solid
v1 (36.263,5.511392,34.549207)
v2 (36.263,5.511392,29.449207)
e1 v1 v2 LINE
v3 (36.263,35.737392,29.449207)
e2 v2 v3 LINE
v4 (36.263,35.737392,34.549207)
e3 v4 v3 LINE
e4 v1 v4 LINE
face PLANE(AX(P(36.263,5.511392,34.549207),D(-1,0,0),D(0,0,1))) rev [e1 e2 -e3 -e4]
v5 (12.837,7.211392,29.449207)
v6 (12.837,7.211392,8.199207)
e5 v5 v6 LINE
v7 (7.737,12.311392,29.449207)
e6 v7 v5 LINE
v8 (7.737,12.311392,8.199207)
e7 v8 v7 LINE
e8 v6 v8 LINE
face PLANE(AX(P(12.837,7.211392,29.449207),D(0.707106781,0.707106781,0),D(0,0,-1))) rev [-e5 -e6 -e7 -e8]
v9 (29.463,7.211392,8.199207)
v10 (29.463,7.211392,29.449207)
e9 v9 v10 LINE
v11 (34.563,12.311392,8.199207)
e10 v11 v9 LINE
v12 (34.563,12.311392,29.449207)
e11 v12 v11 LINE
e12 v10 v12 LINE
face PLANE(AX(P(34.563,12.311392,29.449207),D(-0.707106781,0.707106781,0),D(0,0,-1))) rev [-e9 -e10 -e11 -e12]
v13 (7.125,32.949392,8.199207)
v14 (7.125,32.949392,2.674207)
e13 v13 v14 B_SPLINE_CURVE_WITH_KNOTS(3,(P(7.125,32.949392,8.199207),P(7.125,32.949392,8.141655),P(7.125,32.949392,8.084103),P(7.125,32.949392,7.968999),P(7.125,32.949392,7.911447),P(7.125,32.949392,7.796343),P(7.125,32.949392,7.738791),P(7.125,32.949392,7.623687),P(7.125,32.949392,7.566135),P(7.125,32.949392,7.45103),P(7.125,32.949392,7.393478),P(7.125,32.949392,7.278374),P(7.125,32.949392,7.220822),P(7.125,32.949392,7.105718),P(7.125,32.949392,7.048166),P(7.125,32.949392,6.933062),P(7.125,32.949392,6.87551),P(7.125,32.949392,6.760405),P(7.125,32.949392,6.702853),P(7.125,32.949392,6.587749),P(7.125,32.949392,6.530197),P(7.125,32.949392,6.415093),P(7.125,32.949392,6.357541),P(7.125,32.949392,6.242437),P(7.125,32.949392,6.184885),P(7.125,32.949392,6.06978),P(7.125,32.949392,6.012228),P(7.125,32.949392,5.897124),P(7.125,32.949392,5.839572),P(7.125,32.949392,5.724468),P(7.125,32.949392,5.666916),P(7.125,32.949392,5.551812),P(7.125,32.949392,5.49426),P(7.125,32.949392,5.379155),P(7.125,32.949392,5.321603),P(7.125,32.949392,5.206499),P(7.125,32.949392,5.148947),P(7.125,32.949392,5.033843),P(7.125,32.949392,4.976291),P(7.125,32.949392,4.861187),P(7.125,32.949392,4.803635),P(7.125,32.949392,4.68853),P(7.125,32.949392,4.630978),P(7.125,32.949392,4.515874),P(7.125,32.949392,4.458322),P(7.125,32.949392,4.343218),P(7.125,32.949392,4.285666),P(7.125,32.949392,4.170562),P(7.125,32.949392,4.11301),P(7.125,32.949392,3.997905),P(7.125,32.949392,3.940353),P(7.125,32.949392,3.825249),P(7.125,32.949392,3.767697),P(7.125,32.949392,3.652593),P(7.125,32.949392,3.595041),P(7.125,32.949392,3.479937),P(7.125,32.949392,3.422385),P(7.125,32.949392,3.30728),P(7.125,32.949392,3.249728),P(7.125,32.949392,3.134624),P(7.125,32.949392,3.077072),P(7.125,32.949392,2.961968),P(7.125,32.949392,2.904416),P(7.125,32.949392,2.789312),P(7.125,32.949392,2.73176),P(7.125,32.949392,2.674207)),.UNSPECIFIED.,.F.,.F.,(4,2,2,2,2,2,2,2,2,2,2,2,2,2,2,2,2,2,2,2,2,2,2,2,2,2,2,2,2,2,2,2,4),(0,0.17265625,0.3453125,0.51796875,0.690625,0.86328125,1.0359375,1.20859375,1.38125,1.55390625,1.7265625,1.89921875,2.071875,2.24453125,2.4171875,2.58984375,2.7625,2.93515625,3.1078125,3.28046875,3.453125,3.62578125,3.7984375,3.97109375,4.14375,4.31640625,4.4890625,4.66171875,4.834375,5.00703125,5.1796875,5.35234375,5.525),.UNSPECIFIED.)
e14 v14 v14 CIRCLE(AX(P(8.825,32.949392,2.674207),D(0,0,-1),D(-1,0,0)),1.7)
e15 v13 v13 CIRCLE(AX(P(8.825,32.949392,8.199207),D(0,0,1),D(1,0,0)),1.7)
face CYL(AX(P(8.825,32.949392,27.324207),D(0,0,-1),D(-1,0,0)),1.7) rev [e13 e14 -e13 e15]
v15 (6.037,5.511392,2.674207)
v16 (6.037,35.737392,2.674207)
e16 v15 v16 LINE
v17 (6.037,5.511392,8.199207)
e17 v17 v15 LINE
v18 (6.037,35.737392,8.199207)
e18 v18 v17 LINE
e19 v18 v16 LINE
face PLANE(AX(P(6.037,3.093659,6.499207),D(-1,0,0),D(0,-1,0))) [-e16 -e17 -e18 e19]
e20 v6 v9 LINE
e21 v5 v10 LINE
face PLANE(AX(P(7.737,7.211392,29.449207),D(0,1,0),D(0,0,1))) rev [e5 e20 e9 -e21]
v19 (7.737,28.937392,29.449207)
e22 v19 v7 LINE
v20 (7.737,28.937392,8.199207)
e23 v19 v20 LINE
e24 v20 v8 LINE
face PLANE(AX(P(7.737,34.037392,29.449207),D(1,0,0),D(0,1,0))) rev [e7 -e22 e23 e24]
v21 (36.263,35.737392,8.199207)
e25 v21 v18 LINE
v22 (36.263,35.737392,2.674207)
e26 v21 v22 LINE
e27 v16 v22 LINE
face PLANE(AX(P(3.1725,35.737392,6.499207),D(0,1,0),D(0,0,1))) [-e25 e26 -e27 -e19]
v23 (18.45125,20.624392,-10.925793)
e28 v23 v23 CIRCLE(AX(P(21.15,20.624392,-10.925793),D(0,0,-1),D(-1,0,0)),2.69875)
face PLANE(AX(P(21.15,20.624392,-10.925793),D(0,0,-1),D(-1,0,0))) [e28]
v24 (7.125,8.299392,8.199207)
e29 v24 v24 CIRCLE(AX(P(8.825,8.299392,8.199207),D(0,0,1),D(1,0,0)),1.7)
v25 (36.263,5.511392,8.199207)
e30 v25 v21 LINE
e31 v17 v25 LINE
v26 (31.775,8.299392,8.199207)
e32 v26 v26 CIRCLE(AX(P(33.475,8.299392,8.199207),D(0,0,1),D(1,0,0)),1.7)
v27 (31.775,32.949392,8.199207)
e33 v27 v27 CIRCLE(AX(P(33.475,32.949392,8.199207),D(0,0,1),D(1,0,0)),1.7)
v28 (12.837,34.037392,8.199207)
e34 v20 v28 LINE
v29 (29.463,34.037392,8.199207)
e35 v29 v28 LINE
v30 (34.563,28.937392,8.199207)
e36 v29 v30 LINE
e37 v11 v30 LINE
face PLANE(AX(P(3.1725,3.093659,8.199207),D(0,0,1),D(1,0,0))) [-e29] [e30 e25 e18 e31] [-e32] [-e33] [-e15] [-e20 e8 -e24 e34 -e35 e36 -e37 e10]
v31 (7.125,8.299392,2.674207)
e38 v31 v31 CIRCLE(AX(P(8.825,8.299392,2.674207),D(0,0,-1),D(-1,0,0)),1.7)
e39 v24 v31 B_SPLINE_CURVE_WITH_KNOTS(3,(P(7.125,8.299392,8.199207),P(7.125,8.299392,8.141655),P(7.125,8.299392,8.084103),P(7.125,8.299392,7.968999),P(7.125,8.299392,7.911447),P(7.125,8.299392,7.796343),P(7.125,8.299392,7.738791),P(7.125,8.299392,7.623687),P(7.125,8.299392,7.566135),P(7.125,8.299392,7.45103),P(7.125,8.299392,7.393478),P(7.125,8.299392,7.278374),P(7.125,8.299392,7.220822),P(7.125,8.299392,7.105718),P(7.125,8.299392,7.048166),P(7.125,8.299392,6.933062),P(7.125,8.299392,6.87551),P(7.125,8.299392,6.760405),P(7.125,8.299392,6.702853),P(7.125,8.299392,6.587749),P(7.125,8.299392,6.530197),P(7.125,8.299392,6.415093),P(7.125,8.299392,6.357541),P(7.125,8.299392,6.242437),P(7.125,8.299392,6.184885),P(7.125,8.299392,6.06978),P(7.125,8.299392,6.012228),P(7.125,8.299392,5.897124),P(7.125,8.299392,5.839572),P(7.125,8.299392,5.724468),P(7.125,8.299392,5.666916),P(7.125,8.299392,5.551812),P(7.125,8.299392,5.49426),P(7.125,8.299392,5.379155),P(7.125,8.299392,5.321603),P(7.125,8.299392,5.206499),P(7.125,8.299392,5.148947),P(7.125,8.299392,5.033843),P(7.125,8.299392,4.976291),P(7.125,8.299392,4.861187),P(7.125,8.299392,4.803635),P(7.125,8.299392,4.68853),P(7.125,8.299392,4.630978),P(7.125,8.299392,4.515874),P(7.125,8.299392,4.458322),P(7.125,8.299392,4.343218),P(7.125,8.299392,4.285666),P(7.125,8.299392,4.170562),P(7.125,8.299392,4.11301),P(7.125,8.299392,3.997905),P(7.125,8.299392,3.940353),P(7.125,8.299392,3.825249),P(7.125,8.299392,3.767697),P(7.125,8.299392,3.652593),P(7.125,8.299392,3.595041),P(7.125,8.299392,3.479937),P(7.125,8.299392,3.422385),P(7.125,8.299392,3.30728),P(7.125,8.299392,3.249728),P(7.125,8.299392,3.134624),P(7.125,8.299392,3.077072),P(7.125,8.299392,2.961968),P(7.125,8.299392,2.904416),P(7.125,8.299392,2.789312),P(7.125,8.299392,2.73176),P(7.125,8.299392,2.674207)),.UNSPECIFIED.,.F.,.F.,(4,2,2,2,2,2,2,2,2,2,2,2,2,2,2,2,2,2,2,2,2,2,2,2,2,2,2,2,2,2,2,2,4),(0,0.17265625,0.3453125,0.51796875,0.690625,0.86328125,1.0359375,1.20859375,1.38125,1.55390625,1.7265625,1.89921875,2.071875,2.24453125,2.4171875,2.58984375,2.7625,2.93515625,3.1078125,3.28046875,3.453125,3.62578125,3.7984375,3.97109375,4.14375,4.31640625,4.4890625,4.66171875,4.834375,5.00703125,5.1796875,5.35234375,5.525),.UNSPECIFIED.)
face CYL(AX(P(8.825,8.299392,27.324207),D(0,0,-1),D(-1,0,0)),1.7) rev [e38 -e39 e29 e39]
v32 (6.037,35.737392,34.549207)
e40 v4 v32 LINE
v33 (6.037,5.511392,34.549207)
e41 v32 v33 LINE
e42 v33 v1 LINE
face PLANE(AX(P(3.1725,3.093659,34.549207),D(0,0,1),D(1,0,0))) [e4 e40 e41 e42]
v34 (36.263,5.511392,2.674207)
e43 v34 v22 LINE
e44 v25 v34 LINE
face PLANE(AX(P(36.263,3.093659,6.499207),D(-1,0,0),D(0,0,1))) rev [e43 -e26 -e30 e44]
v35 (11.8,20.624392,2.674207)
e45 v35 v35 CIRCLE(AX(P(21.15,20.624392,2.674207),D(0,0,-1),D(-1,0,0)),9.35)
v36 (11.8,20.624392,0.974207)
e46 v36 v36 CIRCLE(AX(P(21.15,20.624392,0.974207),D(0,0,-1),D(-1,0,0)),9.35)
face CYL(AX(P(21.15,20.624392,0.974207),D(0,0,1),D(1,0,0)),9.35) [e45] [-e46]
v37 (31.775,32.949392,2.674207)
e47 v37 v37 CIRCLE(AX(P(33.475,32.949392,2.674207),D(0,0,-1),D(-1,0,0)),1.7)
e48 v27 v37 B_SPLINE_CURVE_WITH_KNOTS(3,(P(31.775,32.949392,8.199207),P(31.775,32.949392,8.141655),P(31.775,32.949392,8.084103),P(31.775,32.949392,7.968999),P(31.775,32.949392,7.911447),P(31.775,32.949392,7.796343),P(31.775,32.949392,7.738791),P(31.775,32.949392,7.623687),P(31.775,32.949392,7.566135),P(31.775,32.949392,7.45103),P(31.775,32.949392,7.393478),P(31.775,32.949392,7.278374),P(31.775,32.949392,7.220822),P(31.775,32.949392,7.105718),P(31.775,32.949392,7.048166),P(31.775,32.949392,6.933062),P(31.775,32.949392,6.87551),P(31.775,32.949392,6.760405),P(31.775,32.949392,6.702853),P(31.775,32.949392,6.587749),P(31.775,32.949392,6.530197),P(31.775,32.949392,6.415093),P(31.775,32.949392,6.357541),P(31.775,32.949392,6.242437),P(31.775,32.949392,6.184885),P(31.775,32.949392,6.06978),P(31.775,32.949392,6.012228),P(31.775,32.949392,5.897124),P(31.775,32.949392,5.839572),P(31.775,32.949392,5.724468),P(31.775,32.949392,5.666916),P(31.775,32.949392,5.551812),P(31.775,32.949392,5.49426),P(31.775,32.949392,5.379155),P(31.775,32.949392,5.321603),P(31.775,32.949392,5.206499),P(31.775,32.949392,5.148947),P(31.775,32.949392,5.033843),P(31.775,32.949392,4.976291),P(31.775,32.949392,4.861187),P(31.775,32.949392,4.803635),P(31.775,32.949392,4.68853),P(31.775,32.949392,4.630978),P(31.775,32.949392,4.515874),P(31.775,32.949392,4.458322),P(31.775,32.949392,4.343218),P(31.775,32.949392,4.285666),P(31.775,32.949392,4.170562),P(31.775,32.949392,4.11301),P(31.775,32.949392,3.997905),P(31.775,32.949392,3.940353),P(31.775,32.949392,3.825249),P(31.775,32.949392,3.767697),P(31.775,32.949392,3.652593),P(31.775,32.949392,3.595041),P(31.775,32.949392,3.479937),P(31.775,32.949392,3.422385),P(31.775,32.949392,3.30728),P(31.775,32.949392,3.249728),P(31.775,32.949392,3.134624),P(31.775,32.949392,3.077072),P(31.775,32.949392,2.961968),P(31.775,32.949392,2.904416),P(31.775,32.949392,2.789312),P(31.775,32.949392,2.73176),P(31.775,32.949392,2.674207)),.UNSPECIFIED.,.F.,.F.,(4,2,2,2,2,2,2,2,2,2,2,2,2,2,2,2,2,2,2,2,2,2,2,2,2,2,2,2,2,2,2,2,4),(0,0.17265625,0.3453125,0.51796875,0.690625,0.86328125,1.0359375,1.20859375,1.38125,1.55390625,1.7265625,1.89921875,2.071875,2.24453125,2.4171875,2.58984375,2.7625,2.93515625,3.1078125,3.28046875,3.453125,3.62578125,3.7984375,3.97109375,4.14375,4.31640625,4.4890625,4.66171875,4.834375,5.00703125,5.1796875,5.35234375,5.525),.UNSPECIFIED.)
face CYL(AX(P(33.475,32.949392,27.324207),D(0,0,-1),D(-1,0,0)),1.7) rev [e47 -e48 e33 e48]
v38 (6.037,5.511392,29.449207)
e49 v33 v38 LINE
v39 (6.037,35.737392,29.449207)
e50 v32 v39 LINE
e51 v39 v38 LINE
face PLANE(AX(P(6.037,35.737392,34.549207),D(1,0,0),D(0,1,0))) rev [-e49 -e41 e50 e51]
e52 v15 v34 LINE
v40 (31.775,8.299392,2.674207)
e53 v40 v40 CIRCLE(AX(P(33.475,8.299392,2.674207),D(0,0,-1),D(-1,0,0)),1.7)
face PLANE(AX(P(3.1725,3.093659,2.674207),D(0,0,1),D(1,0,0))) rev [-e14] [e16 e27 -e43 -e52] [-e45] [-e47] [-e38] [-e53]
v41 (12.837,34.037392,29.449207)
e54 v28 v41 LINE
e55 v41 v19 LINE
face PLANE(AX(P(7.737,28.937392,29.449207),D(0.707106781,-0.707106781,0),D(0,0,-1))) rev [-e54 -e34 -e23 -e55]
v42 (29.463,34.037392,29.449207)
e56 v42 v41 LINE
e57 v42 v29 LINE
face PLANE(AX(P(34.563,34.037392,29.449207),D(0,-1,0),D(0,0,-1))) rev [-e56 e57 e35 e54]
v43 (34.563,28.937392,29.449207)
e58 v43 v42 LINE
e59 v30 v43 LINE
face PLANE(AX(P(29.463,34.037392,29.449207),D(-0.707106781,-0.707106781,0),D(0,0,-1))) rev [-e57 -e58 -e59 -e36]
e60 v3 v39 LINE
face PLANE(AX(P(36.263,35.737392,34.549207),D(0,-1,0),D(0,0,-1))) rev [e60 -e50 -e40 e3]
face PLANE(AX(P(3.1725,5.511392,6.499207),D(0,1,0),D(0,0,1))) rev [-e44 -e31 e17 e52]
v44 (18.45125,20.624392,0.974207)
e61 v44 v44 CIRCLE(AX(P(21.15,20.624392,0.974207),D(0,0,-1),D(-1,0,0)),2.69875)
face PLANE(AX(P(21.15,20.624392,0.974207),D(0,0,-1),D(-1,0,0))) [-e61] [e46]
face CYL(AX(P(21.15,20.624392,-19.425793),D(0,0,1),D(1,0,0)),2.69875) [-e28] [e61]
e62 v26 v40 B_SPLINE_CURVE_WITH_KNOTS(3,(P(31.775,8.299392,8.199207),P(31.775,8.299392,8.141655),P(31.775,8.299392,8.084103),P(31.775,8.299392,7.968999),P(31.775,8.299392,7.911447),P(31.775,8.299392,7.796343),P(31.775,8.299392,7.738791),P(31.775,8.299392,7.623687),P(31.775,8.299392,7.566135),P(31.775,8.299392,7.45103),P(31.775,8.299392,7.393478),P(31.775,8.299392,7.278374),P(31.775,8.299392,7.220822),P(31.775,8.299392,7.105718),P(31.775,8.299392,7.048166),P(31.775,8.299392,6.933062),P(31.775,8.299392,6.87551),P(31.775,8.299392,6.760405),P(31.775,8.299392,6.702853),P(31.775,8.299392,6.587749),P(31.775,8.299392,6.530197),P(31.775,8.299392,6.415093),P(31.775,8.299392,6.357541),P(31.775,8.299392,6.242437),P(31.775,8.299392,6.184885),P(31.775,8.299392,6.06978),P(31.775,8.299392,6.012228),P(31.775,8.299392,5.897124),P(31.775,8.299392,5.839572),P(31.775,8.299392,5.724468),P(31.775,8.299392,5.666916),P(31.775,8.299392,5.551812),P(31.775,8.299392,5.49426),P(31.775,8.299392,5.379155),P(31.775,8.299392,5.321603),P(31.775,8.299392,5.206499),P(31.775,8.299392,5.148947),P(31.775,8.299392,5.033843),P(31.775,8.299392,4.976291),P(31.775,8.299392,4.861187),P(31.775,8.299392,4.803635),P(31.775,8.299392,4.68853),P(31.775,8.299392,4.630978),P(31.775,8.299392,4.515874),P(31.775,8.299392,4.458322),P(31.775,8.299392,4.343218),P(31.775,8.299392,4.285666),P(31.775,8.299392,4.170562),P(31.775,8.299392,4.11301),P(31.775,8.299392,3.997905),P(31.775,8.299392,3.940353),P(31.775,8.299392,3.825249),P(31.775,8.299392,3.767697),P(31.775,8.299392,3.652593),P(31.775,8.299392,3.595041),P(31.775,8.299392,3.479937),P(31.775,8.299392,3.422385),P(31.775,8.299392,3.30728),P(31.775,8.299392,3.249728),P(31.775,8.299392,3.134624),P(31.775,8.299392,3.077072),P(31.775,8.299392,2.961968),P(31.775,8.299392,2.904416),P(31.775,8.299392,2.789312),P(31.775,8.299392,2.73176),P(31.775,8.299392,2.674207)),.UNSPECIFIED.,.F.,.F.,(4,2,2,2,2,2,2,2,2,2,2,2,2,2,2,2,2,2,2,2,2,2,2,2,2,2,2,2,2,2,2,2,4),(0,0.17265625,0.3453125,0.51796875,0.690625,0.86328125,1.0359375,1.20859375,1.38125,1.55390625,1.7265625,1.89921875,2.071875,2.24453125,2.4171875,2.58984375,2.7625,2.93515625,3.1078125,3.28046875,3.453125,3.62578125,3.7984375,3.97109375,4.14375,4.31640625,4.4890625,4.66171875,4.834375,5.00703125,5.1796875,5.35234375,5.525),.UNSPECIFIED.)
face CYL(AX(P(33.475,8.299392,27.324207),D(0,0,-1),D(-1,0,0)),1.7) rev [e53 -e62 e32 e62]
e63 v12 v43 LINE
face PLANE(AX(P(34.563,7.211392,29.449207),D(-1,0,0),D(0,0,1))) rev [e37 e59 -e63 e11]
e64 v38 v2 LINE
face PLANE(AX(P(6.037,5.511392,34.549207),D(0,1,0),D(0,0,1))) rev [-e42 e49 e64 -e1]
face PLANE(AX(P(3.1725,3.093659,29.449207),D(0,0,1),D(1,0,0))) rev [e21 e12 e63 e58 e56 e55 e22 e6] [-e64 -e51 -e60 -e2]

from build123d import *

# Parameters (mm, degrees)
SKETCH1_W           = 35.56
SKETCH1_H           = 35.56
BOSS_EXTRUDE1_DEPTH = 4.5
SKETCH2_W           = 35.56
SKETCH2_H           = 35.56
BOSS_EXTRUDE2_DEPTH = 2
SKETCH5_R           = 11
BOSS_EXTRUDE5_DEPTH = 2
SKETCH6_R           = 3.175
BOSS_EXTRUDE6_DEPTH = 24
SKETCH7_R           = 2
CUT_EXTRUDE3_DEPTH  = 29
SKETCH8_W           = 31.56
SKETCH8_H           = 31.56
BOSS_EXTRUDE7_DEPTH = 25
SKETCH9_W           = 35.56
SKETCH9_H           = 35.56
BOSS_EXTRUDE8_DEPTH = 6
CHAMFER1_SIZE       = 6
SCALE1_SCALE        = 0.85
CUT_EXTRUDE4_START  = -8.5
SKETCH10_R          = 2.69875
CUT_EXTRUDE4_DEPTH  = 8.5


with BuildPart() as part:
    # Sketch1 → Boss-Extrude1 (new body)
    with BuildSketch(Plane.XY):
        with Locations((21.15, 20.624391857)):
            Rectangle(SKETCH1_W, SKETCH1_H)
    extrude(amount=BOSS_EXTRUDE1_DEPTH)

    # Sketch2 → Boss-Extrude2 (add)
    with BuildSketch(Plane.XY.offset(4.5)):
        with Locations((21.15, 20.624391857)):
            Rectangle(SKETCH2_W, SKETCH2_H)
    extrude(amount=BOSS_EXTRUDE2_DEPTH)

    # Sketch5 → Boss-Extrude5 (add)
    with BuildSketch(Plane(origin=(0, 0, 0), x_dir=(-1, 0, 0), z_dir=(0, 0, -1))):
        with Locations((-21.15, 20.624391857)):
            Circle(SKETCH5_R)
    extrude(amount=BOSS_EXTRUDE5_DEPTH)

    # Sketch6 → Boss-Extrude6 (add)
    with BuildSketch(Plane(origin=(0, 0, -2), x_dir=(-1, 0, 0), z_dir=(0, 0, -1))):
        with Locations((-21.15, 20.624391857)):
            Circle(SKETCH6_R)
    extrude(amount=BOSS_EXTRUDE6_DEPTH)

    # Sketch7 → Cut-Extrude3 (cut)
    with BuildSketch(Plane(origin=(0, 0, 0), x_dir=(-1, 0, 0), z_dir=(0, 0, -1))):
        with Locations((-35.65, 6.124391857)):
            Circle(SKETCH7_R)
        with Locations((-6.65, 6.124391857)):
            Circle(SKETCH7_R)
        with Locations((-6.65, 35.124391857)):
            Circle(SKETCH7_R)
        with Locations((-35.65, 35.124391857)):
            Circle(SKETCH7_R)
    extrude(amount=-CUT_EXTRUDE3_DEPTH, mode=Mode.SUBTRACT)

    # Sketch8 → Boss-Extrude7 (add)
    with BuildSketch(Plane.XY.offset(6.5)):
        with Locations((21.15, 20.624391857)):
            Rectangle(SKETCH8_W, SKETCH8_H)
    extrude(amount=BOSS_EXTRUDE7_DEPTH)

    # Sketch9 → Boss-Extrude8 (add)
    with BuildSketch(Plane.XY.offset(31.5)):
        with Locations((21.15, 20.624391857)):
            Rectangle(SKETCH9_W, SKETCH9_H)
    extrude(amount=BOSS_EXTRUDE8_DEPTH)

    # Chamfer1
    # the kernel refuses this chamfer: 6 mm, written as the material it takes off along each edge
    with BuildSketch(Plane(origin=(5.37, 36.404391857, 6.5), x_dir=(0.9996219169112968, 0.02749587661058678, 0), z_dir=(0, 0, 1)), Plane(origin=(36.93, 4.844391857, 6.5), x_dir=(-0.9996219169112969, -0.027495876610586355, 0), z_dir=(0, 0, 1)), Plane(origin=(36.93, 36.404391857, 6.5), x_dir=(0.02749587661058678, -0.9996219169112968, 0), z_dir=(0, 0, 1))) as chamfer1_piece_1:
        Polygon((CHAMFER1_SIZE * 0.999621916911, -CHAMFER1_SIZE * 0.0274958766106), (-CHAMFER1_SIZE * 0.0274958766106, -CHAMFER1_SIZE * 0.999621916911), (0, 0), align=None)
    extrude(amount=25, mode=Mode.SUBTRACT)
    with BuildSketch(Plane(origin=(5.37, 4.844391857, 6.5), x_dir=(0.9996219169112969, -0.027495876610586348, 0), z_dir=(0, 0, 1))) as chamfer1_piece_2:
        Polygon((CHAMFER1_SIZE * 0.999621916911, CHAMFER1_SIZE * 0.0274958766106), (-CHAMFER1_SIZE * 0.0274958766106, CHAMFER1_SIZE * 0.999621916911), (0, 0), align=None)
    extrude(amount=25, mode=Mode.SUBTRACT)


with BuildPart() as part_1:
    # Scale1: scaled about (21.15, 20.624391857, 17.82804973)
    add(part.part.scale(SCALE1_SCALE).moved(Location((3.1725, 3.093658779, 2.67420746))))

    # Sketch10 → Cut-Extrude4 (cut)
    with BuildSketch(Plane(origin=(0, 0, -19.425792541), x_dir=(-1, 0, 0), z_dir=(0, 0, -1)).offset(CUT_EXTRUDE4_START)):
        with Locations((-21.15, 20.624391857)):
            Circle(SKETCH10_R)
    extrude(amount=CUT_EXTRUDE4_DEPTH, mode=Mode.SUBTRACT)


solid = part_1.part
